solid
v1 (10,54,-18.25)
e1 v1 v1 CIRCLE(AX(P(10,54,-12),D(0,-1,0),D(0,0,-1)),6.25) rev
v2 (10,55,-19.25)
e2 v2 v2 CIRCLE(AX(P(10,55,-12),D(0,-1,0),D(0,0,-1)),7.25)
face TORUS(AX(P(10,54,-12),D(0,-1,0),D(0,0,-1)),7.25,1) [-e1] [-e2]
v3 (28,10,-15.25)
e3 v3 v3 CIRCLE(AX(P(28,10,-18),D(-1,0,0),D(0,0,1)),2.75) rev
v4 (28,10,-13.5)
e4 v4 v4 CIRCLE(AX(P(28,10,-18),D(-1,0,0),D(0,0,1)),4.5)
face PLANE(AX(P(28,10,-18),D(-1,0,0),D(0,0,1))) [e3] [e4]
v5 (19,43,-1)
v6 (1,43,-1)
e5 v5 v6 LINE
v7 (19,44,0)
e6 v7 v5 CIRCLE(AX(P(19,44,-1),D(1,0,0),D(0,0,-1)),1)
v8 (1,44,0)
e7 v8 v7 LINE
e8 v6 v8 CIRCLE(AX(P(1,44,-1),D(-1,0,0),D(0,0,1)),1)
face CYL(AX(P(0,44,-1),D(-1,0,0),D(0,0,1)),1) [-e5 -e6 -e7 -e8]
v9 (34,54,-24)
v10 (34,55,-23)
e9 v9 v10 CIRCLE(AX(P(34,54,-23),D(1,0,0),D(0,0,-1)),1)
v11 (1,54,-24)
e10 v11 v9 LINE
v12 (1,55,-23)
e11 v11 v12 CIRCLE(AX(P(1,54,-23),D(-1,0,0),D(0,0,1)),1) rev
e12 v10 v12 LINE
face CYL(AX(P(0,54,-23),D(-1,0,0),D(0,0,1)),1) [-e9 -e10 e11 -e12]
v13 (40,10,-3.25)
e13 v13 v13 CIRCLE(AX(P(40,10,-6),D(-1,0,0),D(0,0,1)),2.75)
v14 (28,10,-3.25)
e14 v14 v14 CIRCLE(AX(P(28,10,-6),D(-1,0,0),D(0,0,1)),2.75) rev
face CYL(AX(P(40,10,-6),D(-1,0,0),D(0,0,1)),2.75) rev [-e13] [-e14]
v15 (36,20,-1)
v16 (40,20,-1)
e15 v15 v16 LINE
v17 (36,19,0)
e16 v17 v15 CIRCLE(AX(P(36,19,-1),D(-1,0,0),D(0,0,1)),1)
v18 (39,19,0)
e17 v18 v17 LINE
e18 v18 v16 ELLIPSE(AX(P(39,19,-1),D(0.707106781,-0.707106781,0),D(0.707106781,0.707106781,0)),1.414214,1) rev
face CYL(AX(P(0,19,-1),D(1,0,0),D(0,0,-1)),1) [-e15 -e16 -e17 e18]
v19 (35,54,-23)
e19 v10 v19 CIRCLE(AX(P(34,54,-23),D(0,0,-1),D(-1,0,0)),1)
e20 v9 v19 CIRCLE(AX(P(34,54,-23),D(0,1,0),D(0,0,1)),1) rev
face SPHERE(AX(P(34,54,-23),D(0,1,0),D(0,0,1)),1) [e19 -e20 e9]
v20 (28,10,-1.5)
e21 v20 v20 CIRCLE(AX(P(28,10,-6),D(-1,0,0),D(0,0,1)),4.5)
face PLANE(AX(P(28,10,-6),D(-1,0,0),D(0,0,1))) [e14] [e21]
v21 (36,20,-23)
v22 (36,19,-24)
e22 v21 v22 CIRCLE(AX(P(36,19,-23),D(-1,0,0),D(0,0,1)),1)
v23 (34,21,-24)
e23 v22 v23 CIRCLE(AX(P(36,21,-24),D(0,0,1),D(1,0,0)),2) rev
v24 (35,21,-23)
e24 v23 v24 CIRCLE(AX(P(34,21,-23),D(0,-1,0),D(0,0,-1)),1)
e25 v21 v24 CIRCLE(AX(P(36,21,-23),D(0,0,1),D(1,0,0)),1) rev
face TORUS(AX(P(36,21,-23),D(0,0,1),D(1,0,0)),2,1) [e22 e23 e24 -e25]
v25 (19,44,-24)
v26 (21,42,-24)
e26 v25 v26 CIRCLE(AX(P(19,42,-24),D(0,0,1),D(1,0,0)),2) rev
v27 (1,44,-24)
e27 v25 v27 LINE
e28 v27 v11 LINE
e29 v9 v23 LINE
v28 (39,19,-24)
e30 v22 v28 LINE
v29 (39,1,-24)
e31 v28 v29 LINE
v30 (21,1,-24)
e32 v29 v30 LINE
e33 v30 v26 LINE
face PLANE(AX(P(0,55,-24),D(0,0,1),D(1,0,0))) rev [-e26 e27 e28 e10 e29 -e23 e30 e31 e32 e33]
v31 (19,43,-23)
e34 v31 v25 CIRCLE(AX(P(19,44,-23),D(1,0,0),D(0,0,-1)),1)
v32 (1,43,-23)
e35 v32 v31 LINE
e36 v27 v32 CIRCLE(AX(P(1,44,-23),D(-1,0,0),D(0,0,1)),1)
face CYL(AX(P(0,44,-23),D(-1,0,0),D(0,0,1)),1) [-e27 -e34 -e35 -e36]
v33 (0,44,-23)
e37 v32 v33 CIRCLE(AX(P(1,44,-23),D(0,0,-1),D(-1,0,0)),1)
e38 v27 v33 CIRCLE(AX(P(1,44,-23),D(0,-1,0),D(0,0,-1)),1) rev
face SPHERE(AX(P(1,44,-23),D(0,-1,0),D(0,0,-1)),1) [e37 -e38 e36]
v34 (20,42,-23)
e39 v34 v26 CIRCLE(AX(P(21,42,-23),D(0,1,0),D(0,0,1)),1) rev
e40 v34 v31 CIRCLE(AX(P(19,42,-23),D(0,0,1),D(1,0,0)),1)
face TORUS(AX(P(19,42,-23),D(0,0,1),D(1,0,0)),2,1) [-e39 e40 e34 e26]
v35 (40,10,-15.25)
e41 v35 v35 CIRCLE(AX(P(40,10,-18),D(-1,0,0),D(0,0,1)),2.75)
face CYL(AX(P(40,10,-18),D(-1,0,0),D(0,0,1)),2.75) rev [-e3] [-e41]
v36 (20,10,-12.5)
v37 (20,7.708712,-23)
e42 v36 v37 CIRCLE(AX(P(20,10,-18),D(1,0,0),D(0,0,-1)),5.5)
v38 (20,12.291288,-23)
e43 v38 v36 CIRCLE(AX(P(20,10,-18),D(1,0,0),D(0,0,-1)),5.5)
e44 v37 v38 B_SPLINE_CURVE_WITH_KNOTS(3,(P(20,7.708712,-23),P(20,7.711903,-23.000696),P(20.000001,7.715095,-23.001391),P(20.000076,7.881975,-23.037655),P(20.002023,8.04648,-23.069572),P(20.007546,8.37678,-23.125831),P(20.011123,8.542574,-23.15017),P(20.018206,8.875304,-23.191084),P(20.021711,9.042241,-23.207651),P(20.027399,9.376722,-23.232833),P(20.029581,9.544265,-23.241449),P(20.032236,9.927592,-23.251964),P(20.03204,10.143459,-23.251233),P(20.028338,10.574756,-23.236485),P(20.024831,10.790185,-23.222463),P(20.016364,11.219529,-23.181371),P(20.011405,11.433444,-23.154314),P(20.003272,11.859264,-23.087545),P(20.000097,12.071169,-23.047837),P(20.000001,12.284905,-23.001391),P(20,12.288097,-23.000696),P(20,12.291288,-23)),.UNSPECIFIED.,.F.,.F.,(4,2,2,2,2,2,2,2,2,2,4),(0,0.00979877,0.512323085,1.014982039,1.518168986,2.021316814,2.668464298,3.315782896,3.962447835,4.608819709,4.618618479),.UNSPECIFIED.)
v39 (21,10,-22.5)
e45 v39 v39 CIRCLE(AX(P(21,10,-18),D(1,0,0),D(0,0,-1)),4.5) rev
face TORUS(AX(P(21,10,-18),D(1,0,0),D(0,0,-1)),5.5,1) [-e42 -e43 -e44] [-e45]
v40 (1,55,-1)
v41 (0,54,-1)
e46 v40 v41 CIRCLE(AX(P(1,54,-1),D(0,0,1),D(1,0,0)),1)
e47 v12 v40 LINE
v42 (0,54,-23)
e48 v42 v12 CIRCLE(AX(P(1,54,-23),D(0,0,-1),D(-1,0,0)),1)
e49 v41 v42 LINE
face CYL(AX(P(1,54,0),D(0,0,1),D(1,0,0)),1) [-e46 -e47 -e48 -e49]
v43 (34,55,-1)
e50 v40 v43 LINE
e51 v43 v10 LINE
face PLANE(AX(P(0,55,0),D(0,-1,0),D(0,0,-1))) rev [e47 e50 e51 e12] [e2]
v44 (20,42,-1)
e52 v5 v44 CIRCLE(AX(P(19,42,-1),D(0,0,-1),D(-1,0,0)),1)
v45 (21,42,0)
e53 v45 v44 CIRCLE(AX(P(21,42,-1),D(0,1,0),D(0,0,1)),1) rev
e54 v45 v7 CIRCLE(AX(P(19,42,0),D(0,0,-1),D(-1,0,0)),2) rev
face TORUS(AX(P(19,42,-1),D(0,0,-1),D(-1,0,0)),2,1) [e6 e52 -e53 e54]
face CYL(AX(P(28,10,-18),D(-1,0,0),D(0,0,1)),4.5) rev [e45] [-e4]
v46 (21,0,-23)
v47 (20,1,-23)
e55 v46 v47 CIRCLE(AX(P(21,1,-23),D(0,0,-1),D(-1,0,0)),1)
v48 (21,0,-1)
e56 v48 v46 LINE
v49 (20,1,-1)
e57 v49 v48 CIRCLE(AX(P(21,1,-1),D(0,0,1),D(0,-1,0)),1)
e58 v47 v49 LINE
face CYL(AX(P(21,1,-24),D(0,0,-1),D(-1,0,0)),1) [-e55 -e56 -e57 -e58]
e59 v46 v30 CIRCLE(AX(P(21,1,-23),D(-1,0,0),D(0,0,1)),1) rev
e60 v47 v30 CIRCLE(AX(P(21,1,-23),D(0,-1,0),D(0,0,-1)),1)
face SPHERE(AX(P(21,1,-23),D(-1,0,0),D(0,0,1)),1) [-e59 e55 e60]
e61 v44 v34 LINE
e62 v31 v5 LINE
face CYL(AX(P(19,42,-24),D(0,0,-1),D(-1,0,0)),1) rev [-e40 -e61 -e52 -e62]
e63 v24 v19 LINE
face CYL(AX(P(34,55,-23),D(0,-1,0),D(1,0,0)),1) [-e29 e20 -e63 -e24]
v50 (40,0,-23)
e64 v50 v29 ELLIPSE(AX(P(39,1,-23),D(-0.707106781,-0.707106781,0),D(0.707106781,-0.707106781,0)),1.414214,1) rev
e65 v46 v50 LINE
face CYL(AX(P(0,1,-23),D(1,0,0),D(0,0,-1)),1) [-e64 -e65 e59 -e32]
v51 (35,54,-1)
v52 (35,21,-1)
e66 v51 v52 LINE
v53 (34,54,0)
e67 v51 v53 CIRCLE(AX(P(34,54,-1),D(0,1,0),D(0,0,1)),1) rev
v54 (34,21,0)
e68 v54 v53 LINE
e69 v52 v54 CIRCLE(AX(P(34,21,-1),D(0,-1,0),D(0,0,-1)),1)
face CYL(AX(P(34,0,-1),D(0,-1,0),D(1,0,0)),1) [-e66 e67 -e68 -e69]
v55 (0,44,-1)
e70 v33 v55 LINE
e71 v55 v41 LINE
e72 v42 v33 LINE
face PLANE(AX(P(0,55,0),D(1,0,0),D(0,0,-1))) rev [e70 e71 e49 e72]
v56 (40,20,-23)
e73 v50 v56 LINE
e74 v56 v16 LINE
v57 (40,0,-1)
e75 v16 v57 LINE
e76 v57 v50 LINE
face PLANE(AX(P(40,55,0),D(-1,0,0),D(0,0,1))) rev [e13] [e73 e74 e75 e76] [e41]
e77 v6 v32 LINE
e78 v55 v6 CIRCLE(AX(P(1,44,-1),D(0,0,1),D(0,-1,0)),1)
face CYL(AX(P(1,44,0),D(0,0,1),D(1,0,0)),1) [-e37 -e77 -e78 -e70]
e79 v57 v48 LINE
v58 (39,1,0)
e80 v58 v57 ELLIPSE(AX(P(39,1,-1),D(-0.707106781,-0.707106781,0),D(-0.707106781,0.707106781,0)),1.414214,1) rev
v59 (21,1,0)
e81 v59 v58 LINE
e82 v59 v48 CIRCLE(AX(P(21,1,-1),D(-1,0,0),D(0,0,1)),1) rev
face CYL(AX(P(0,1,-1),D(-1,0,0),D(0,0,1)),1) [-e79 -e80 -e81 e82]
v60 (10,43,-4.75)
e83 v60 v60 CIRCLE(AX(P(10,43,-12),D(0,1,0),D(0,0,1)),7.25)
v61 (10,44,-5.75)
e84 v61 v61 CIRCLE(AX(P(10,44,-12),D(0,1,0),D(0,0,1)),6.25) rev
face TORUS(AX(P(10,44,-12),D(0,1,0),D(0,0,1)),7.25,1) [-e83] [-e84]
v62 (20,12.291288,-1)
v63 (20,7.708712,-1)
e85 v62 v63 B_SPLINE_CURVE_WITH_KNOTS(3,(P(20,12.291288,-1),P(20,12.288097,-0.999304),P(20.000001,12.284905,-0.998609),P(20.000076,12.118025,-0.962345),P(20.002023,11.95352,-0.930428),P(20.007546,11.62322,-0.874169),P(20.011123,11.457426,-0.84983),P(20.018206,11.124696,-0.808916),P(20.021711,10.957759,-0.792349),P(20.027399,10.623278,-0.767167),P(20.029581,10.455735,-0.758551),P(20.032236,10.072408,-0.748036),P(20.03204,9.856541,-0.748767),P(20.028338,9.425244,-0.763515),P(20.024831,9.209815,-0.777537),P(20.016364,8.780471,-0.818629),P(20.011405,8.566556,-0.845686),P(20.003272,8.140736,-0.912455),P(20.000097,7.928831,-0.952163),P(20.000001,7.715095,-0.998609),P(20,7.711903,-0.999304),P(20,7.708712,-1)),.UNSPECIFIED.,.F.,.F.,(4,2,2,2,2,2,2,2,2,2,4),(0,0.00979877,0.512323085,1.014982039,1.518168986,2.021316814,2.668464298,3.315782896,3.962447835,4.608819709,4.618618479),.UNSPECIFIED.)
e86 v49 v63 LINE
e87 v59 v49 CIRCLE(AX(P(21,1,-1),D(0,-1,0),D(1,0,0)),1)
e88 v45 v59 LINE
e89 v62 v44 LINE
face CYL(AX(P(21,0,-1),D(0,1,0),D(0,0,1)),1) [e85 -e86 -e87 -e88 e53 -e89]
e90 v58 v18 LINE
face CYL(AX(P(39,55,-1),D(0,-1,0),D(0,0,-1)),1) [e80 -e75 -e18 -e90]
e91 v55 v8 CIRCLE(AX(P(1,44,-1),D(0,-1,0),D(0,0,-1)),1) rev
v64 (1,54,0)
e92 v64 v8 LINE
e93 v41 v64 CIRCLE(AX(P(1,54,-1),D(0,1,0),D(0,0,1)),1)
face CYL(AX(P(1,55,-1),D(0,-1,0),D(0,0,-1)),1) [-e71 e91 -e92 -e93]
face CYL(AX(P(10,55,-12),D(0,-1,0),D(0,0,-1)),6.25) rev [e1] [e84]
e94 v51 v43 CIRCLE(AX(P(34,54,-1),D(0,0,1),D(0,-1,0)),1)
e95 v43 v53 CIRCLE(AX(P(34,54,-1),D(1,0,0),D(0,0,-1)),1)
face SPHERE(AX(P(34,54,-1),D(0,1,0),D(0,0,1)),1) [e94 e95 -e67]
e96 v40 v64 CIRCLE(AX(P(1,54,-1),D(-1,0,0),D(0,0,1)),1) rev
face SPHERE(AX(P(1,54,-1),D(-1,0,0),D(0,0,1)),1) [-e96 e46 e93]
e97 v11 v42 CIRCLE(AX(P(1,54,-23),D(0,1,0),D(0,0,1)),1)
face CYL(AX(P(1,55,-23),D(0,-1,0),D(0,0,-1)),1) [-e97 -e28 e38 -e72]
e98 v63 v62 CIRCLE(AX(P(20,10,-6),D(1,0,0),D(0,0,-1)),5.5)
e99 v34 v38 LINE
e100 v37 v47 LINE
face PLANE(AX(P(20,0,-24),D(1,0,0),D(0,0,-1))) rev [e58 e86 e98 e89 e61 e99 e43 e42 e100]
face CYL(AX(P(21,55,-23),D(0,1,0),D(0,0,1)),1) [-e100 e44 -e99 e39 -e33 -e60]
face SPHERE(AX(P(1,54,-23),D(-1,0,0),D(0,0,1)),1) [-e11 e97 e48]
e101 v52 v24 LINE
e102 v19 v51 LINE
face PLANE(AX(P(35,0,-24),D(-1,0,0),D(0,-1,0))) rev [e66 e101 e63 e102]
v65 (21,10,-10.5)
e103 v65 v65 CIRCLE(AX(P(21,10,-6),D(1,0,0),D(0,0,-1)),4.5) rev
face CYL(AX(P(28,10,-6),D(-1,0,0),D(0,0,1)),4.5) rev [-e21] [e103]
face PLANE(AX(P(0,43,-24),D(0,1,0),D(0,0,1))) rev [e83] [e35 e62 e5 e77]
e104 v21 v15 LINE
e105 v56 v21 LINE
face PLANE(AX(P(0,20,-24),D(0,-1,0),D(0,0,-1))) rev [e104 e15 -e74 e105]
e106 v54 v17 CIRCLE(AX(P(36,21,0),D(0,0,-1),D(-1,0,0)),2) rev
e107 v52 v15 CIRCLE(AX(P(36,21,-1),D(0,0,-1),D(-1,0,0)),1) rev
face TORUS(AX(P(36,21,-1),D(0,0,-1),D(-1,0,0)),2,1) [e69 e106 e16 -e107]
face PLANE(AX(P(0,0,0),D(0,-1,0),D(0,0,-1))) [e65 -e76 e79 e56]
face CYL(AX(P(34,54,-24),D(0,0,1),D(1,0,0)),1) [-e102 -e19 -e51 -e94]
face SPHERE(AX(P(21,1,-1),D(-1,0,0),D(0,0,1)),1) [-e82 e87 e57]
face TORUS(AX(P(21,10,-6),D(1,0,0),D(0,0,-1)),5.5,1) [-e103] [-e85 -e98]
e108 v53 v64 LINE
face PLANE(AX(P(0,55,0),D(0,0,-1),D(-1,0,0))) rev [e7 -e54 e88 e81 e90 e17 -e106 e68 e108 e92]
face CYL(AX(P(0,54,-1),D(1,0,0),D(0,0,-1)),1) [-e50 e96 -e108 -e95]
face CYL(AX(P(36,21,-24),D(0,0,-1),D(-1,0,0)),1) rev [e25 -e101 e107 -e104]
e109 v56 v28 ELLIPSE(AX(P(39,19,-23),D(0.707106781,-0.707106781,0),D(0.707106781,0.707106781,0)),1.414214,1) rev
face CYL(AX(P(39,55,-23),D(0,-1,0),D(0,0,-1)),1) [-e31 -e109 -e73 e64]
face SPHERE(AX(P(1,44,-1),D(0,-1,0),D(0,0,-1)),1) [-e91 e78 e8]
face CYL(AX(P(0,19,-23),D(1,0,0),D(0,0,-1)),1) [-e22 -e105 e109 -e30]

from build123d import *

# Parameters (mm, degrees)
SKETCH4_W           = 40
SKETCH4_H           = 24
BOSS_EXTRUDE2_DEPTH = 55
SKETCH6_W           = 5
SKETCH6_H           = 35
SKETCH6_W_2         = 20
SKETCH6_H_2         = 43
CUT_EXTRUDE1_DEPTH  = 73.117958928
SKETCH7_R           = 6.25
CUT_EXTRUDE2_DEPTH  = 64.442887702
SKETCH10_R          = 2.75
CUT_EXTRUDE4_DEPTH  = 64.253458403
SKETCH12_R          = 4.5
CUT_EXTRUDE5_DEPTH  = 8
FILLET1_R           = 1
FILLET2_R           = 1


with BuildPart() as part:
    # Sketch4 → Boss-Extrude2 (new body)
    with BuildSketch(Plane(origin=(0, 0, 0), x_dir=(1, 0, 0), z_dir=(0, 1, 0))):
        with Locations((20, 12)):
            Rectangle(SKETCH4_W, SKETCH4_H)
    extrude(amount=BOSS_EXTRUDE2_DEPTH)

    # Sketch6 → Cut-Extrude1 (cut, through all)
    with BuildSketch(Plane.XY):
        with Locations((37.5, 37.5)):
            Rectangle(SKETCH6_W, SKETCH6_H)
        with Locations((10, 21.5)):
            Rectangle(SKETCH6_W_2, SKETCH6_H_2)
    extrude(amount=-CUT_EXTRUDE1_DEPTH, mode=Mode.SUBTRACT)

    # Sketch7 → Cut-Extrude2 (cut, through all)
    with BuildSketch(Plane(origin=(0, 43, 0), x_dir=(-1, 0, 0), z_dir=(0, -1, 0))):
        with Locations(Location((-10, 12, 0), (0, 0, 90))):
            Circle(SKETCH7_R)
    extrude(amount=-CUT_EXTRUDE2_DEPTH, mode=Mode.SUBTRACT)

    # Sketch10 → Cut-Extrude4 (cut, through all)
    with BuildSketch(Plane.ZY.offset(-20)):
        with Locations((-18, 10)):
            Circle(SKETCH10_R)
        with Locations((-6, 10)):
            Circle(SKETCH10_R)
    extrude(amount=-CUT_EXTRUDE4_DEPTH, mode=Mode.SUBTRACT)

    # Sketch12 → Cut-Extrude5 (cut)
    with BuildSketch(Plane.ZY.offset(-20)):
        with Locations((-18, 10)):
            Circle(SKETCH12_R)
        with Locations((-6, 10)):
            Circle(SKETCH12_R)
    extrude(amount=-CUT_EXTRUDE5_DEPTH, mode=Mode.SUBTRACT)

    # Fillet1
    # the kernel refuses this fillet: 1 mm, written as the material it adds along each edge
    with BuildSketch(Plane(origin=(35, 20, 0), x_dir=(1, 0, 0), z_dir=(0, 0, -1)), Plane(origin=(20, 43, 0), x_dir=(-1, 0, 0), z_dir=(0, 0, -1))) as fillet1_piece_1:
        with BuildLine():
            CenterArc((FILLET1_R, -FILLET1_R), FILLET1_R, 90, 90)
            Line((0, -FILLET1_R), (0, 0))
            Line((0, 0), (FILLET1_R, 0))
        make_face()
    extrude(amount=24)
    # the kernel refuses this fillet: 1 mm, written as the material it takes off along each edge
    with BuildSketch(Plane(origin=(21, 1, -1), x_dir=(-1, 0, 0), z_dir=(0, 0, 1))) as fillet1_2_piece_1_section:
        Polygon((0, 0), (FILLET1_R, 0), (FILLET1_R, FILLET1_R), (0, FILLET1_R), align=None)
    fillet1_2_piece_1 = extrude(amount=FILLET1_R, mode=Mode.PRIVATE)
    fillet1_2_piece_1 = fillet1_2_piece_1 - Plane(origin=(21, 1, -1), x_dir=(0.7071067811865475, 0.7071067811865475, 0), z_dir=(0, 0, 1)) * Sphere(FILLET1_R, mode=Mode.PRIVATE)
    add(fillet1_2_piece_1, mode=Mode.SUBTRACT)
    with BuildSketch(Plane(origin=(34, 54, -23), x_dir=(1, 0, 0), z_dir=(0, 0, -1))) as fillet1_2_piece_2_section:
        Polygon((0, 0), (FILLET1_R, 0), (FILLET1_R, -FILLET1_R), (0, -FILLET1_R), align=None)
    fillet1_2_piece_2 = extrude(amount=FILLET1_R, mode=Mode.PRIVATE)
    fillet1_2_piece_2 = fillet1_2_piece_2 - Plane(origin=(34, 54, -23), x_dir=(-0.7071067811865475, -0.7071067811865477, 0), z_dir=(0, 0, -1)) * Sphere(FILLET1_R, mode=Mode.PRIVATE)
    add(fillet1_2_piece_2, mode=Mode.SUBTRACT)
    with BuildSketch(Plane(origin=(1, 54, -23), x_dir=(0, 0, -1), z_dir=(-1, 0, 0))) as fillet1_2_piece_3_section:
        Polygon((0, 0), (FILLET1_R, 0), (FILLET1_R, -FILLET1_R), (0, -FILLET1_R), align=None)
    fillet1_2_piece_3 = extrude(amount=FILLET1_R, mode=Mode.PRIVATE)
    fillet1_2_piece_3 = fillet1_2_piece_3 - Plane(origin=(1, 54, -23), x_dir=(0, -0.7071067811865475, 0.7071067811865475), z_dir=(-1, 0, 0)) * Sphere(FILLET1_R, mode=Mode.PRIVATE)
    add(fillet1_2_piece_3, mode=Mode.SUBTRACT)
    with BuildSketch(Plane(origin=(34, 54, -1), x_dir=(1, 0, 0), z_dir=(0, 0, 1))) as fillet1_2_piece_4_section:
        Polygon((0, 0), (FILLET1_R, 0), (FILLET1_R, FILLET1_R), (0, FILLET1_R), align=None)
    fillet1_2_piece_4 = extrude(amount=FILLET1_R, mode=Mode.PRIVATE)
    fillet1_2_piece_4 = fillet1_2_piece_4 - Plane(origin=(34, 54, -1), x_dir=(-0.7071067811865475, -0.7071067811865477, 0), z_dir=(0, 0, 1)) * Sphere(FILLET1_R, mode=Mode.PRIVATE)
    add(fillet1_2_piece_4, mode=Mode.SUBTRACT)
    with BuildSketch(Plane(origin=(21, 1, -23), x_dir=(-1, 0, 0), z_dir=(0, -1, 0))) as fillet1_2_piece_5_section:
        Polygon((0, 0), (FILLET1_R, 0), (FILLET1_R, FILLET1_R), (0, FILLET1_R), align=None)
    fillet1_2_piece_5 = extrude(amount=FILLET1_R, mode=Mode.PRIVATE)
    fillet1_2_piece_5 = fillet1_2_piece_5 - Plane(origin=(21, 1, -23), x_dir=(0.7071067811865475, 0, 0.7071067811865475), z_dir=(0, -1, 0)) * Sphere(FILLET1_R, mode=Mode.PRIVATE)
    add(fillet1_2_piece_5, mode=Mode.SUBTRACT)
    with BuildSketch(Plane(origin=(1, 44, -23), x_dir=(0, -1, 0), z_dir=(-1, 0, 0))) as fillet1_2_piece_6_section:
        Polygon((0, 0), (FILLET1_R, 0), (FILLET1_R, -FILLET1_R), (0, -FILLET1_R), align=None)
    fillet1_2_piece_6 = extrude(amount=FILLET1_R, mode=Mode.PRIVATE)
    fillet1_2_piece_6 = fillet1_2_piece_6 - Plane(origin=(1, 44, -23), x_dir=(0, 0.7071067811865475, 0.7071067811865475), z_dir=(-1, 0, 0)) * Sphere(FILLET1_R, mode=Mode.PRIVATE)
    add(fillet1_2_piece_6, mode=Mode.SUBTRACT)
    with BuildSketch(Plane(origin=(1, 44, -1), x_dir=(0, -1, 0), z_dir=(-1, 0, 0))) as fillet1_2_piece_7_section:
        Polygon((0, 0), (FILLET1_R, 0), (FILLET1_R, FILLET1_R), (0, FILLET1_R), align=None)
    fillet1_2_piece_7 = extrude(amount=FILLET1_R, mode=Mode.PRIVATE)
    fillet1_2_piece_7 = fillet1_2_piece_7 - Plane(origin=(1, 44, -1), x_dir=(0, 0.7071067811865475, -0.7071067811865475), z_dir=(-1, 0, 0)) * Sphere(FILLET1_R, mode=Mode.PRIVATE)
    add(fillet1_2_piece_7, mode=Mode.SUBTRACT)
    with BuildSketch(Plane(origin=(1, 54, -1), x_dir=(0, 0, 1), z_dir=(-1, 0, 0))) as fillet1_2_piece_8_section:
        Polygon((0, 0), (FILLET1_R, 0), (FILLET1_R, FILLET1_R), (0, FILLET1_R), align=None)
    fillet1_2_piece_8 = extrude(amount=FILLET1_R, mode=Mode.PRIVATE)
    fillet1_2_piece_8 = fillet1_2_piece_8 - Plane(origin=(1, 54, -1), x_dir=(0, -0.7071067811865475, -0.7071067811865475), z_dir=(-1, 0, 0)) * Sphere(FILLET1_R, mode=Mode.PRIVATE)
    add(fillet1_2_piece_8, mode=Mode.SUBTRACT)
    with BuildSketch(Plane(origin=(21, 0, 0), x_dir=(0, 1, 0), z_dir=(1, 0, 0))) as fillet1_2_piece_9:
        with BuildLine():
            CenterArc((FILLET1_R, -FILLET1_R), FILLET1_R, 90, 90)
            Line((0, -FILLET1_R), (0, 0))
            Line((0, 0), (FILLET1_R, 0))
        make_face()
    extrude(amount=21.5, mode=Mode.SUBTRACT)
    with BuildSketch(Plane(origin=(34, 55, -24), x_dir=(0, 0, 1), z_dir=(-1, 0, 0))) as fillet1_2_piece_10:
        with BuildLine():
            CenterArc((FILLET1_R, -FILLET1_R), FILLET1_R, 90, 90)
            Line((0, -FILLET1_R), (0, 0))
            Line((0, 0), (FILLET1_R, 0))
        make_face()
    extrude(amount=33, mode=Mode.SUBTRACT)
    with BuildSketch(Plane(origin=(40, -2.5, -24), x_dir=(0, 0, 1), z_dir=(0, 1, 0)), Plane(origin=(40, -2.5, 0), x_dir=(-1, 0, 0), z_dir=(0, 1, 0))) as fillet1_2_piece_11:
        with BuildLine():
            CenterArc((FILLET1_R, -FILLET1_R), FILLET1_R, 90, 90)
            Line((0, -FILLET1_R), (0, 0))
            Line((0, 0), (FILLET1_R, 0))
        make_face()
    extrude(amount=25, mode=Mode.SUBTRACT)
    with BuildSketch(Plane(origin=(35, 54, -24), x_dir=(0, 0, 1), z_dir=(0, -1, 0)), Plane(origin=(35, 54, 0), x_dir=(-1, 0, 0), z_dir=(0, -1, 0)), Plane(origin=(1, 55, 0), x_dir=(0, -1, 0), z_dir=(1, 0, 0))) as fillet1_2_piece_12:
        with BuildLine():
            CenterArc((FILLET1_R, FILLET1_R), FILLET1_R, 180, 90)
            Line((0, FILLET1_R), (0, 0))
            Line((0, 0), (FILLET1_R, 0))
        make_face()
    extrude(amount=33, mode=Mode.SUBTRACT)
    with BuildSketch(Plane(origin=(35, 55, -1), x_dir=(0, -1, 0), z_dir=(0, 0, -1)), Plane(origin=(20, 0, -1), x_dir=(0, 1, 0), z_dir=(0, 0, -1))) as fillet1_2_piece_13:
        with BuildLine():
            CenterArc((FILLET1_R, FILLET1_R), FILLET1_R, 180, 90)
            Line((0, FILLET1_R), (0, 0))
            Line((0, 0), (FILLET1_R, 0))
        make_face()
    extrude(amount=22, mode=Mode.SUBTRACT)
    with BuildSketch(Plane(origin=(36, 20, -24), x_dir=(0, 0, 1), z_dir=(1, 0, 0)), Plane(origin=(36, 20, 0), x_dir=(0, -1, 0), z_dir=(1, 0, 0))) as fillet1_2_piece_14:
        with BuildLine():
            CenterArc((FILLET1_R, FILLET1_R), FILLET1_R, 180, 90)
            Line((0, FILLET1_R), (0, 0))
            Line((0, 0), (FILLET1_R, 0))
        make_face()
    extrude(amount=6.5, mode=Mode.SUBTRACT)
    with BuildSketch(Plane(origin=(20, 1, -24), x_dir=(0, 0, 1), z_dir=(0, 1, 0)), Plane(origin=(20, 1, 0), x_dir=(1, 0, 0), z_dir=(0, 1, 0))) as fillet1_2_piece_15:
        with BuildLine():
            CenterArc((FILLET1_R, FILLET1_R), FILLET1_R, 180, 90)
            Line((0, FILLET1_R), (0, 0))
            Line((0, 0), (FILLET1_R, 0))
        make_face()
    extrude(amount=41, mode=Mode.SUBTRACT)
    with BuildSketch(Plane(origin=(19, 43, -24), x_dir=(0, 0, 1), z_dir=(-1, 0, 0)), Plane(origin=(19, 43, 0), x_dir=(0, 1, 0), z_dir=(-1, 0, 0))) as fillet1_2_piece_16:
        with BuildLine():
            CenterArc((FILLET1_R, FILLET1_R), FILLET1_R, 180, 90)
            Line((0, FILLET1_R), (0, 0))
            Line((0, 0), (FILLET1_R, 0))
        make_face()
    extrude(amount=18, mode=Mode.SUBTRACT)
    with BuildSketch(Plane(origin=(0, 43, -1), x_dir=(1, 0, 0), z_dir=(0, 0, -1)), Plane(origin=(0, 55, -23), x_dir=(1, 0, 0), z_dir=(0, 0, 1))) as fillet1_2_piece_17:
        with BuildLine():
            CenterArc((FILLET1_R, -FILLET1_R), FILLET1_R, 90, 90)
            Line((0, -FILLET1_R), (0, 0))
            Line((0, 0), (FILLET1_R, 0))
        make_face()
    extrude(amount=22, mode=Mode.SUBTRACT)
    with BuildSketch(Plane(origin=(10, 55, -12), x_dir=(0, 0, -1), z_dir=(-1, 0, 0))) as fillet1_2_piece_18:
        with BuildLine():
            CenterArc((6.25 + FILLET1_R, FILLET1_R), FILLET1_R, 180, 90)
            Line((6.25, FILLET1_R), (6.25, 0))
            Line((6.25, 0), (6.25 + FILLET1_R, 0))
        make_face()
    revolve(axis=Axis((10, 55, -12), (0, -1, 0)), mode=Mode.SUBTRACT)
    with BuildSketch(Plane(origin=(42.5, 0, -24), x_dir=(0, 0, 1), z_dir=(-1, 0, 0))) as fillet1_2_piece_19:
        with BuildLine():
            CenterArc((FILLET1_R, FILLET1_R), FILLET1_R, 180, 90)
            Line((0, FILLET1_R), (0, 0))
            Line((0, 0), (FILLET1_R, 0))
        make_face()
    extrude(amount=21.5, mode=Mode.SUBTRACT)
    with BuildSketch(Plane(origin=(20, 10, -18), x_dir=(0, 0, 1), z_dir=(0, -1, 0))) as fillet1_2_piece_20:
        with BuildLine():
            CenterArc((4.5 + FILLET1_R, -FILLET1_R), FILLET1_R, 90, 90)
            Line((4.5, -FILLET1_R), (4.5, 0))
            Line((4.5, 0), (4.5 + FILLET1_R, 0))
        make_face()
    revolve(axis=Axis((20, 10, -18), (-1, 0, 0)), mode=Mode.SUBTRACT)
    with BuildSketch(Plane(origin=(20, 10, -6), x_dir=(0, 0, 1), z_dir=(0, -1, 0))) as fillet1_2_piece_21:
        with BuildLine():
            CenterArc((4.5 + FILLET1_R, -FILLET1_R), FILLET1_R, 90, 90)
            Line((4.5, -FILLET1_R), (4.5, 0))
            Line((4.5, 0), (4.5 + FILLET1_R, 0))
        make_face()
    revolve(axis=Axis((20, 10, -6), (-1, 0, 0)), mode=Mode.SUBTRACT)
    with BuildSketch(Plane(origin=(0, 44, -24), x_dir=(0, 0, 1), z_dir=(0, 1, 0)), Plane(origin=(0, 44, 0), x_dir=(1, 0, 0), z_dir=(0, 1, 0))) as fillet1_2_piece_22:
        with BuildLine():
            CenterArc((FILLET1_R, FILLET1_R), FILLET1_R, 180, 90)
            Line((0, FILLET1_R), (0, 0))
            Line((0, 0), (FILLET1_R, 0))
        make_face()
    extrude(amount=10, mode=Mode.SUBTRACT)
    with BuildSketch(Plane(origin=(19, 42, 0), x_dir=(0, 1, 0), z_dir=(-1, 0, 0))) as fillet1_2_piece_23:
        with BuildLine():
            CenterArc((1 + FILLET1_R, FILLET1_R), FILLET1_R, 180, 90)
            Line((1, FILLET1_R), (1, 0))
            Line((1, 0), (1 + FILLET1_R, 0))
        make_face()
    revolve(axis=Axis((19, 42, 0), (0, 0, -1)), revolution_arc=90, mode=Mode.SUBTRACT)
    with BuildSketch(Plane(origin=(19, 42, -24), x_dir=(0, 1, 0), z_dir=(-1, 0, 0))) as fillet1_2_piece_24:
        with BuildLine():
            CenterArc((1 + FILLET1_R, -FILLET1_R), FILLET1_R, 90, 90)
            Line((1 + FILLET1_R, 0), (1, 0))
            Line((1, 0), (1, -FILLET1_R))
        make_face()
    revolve(axis=Axis((19, 42, -24), (0, 0, -1)), revolution_arc=90, mode=Mode.SUBTRACT)
    with BuildSketch(Plane(origin=(36, 21, 0), x_dir=(0, -1, 0), z_dir=(1, 0, 0))) as fillet1_2_piece_25:
        with BuildLine():
            CenterArc((1 + FILLET1_R, FILLET1_R), FILLET1_R, 180, 90)
            Line((1, FILLET1_R), (1, 0))
            Line((1, 0), (1 + FILLET1_R, 0))
        make_face()
    revolve(axis=Axis((36, 21, 0), (0, 0, -1)), revolution_arc=90, mode=Mode.SUBTRACT)
    with BuildSketch(Plane(origin=(36, 21, -24), x_dir=(0, -1, 0), z_dir=(1, 0, 0))) as fillet1_2_piece_26:
        with BuildLine():
            CenterArc((1 + FILLET1_R, -FILLET1_R), FILLET1_R, 90, 90)
            Line((1, -FILLET1_R), (1, 0))
            Line((1, 0), (1 + FILLET1_R, 0))
        make_face()
    revolve(axis=Axis((36, 21, -24), (0, 0, -1)), revolution_arc=90, mode=Mode.SUBTRACT)

    # Fillet2
    fillet2_edges = [part.edges().sort_by_distance(p)[0] for p in [
        (10, 43, -5.75),
    ]]
    fillet(fillet2_edges, radius=FILLET2_R)


solid = part.part
